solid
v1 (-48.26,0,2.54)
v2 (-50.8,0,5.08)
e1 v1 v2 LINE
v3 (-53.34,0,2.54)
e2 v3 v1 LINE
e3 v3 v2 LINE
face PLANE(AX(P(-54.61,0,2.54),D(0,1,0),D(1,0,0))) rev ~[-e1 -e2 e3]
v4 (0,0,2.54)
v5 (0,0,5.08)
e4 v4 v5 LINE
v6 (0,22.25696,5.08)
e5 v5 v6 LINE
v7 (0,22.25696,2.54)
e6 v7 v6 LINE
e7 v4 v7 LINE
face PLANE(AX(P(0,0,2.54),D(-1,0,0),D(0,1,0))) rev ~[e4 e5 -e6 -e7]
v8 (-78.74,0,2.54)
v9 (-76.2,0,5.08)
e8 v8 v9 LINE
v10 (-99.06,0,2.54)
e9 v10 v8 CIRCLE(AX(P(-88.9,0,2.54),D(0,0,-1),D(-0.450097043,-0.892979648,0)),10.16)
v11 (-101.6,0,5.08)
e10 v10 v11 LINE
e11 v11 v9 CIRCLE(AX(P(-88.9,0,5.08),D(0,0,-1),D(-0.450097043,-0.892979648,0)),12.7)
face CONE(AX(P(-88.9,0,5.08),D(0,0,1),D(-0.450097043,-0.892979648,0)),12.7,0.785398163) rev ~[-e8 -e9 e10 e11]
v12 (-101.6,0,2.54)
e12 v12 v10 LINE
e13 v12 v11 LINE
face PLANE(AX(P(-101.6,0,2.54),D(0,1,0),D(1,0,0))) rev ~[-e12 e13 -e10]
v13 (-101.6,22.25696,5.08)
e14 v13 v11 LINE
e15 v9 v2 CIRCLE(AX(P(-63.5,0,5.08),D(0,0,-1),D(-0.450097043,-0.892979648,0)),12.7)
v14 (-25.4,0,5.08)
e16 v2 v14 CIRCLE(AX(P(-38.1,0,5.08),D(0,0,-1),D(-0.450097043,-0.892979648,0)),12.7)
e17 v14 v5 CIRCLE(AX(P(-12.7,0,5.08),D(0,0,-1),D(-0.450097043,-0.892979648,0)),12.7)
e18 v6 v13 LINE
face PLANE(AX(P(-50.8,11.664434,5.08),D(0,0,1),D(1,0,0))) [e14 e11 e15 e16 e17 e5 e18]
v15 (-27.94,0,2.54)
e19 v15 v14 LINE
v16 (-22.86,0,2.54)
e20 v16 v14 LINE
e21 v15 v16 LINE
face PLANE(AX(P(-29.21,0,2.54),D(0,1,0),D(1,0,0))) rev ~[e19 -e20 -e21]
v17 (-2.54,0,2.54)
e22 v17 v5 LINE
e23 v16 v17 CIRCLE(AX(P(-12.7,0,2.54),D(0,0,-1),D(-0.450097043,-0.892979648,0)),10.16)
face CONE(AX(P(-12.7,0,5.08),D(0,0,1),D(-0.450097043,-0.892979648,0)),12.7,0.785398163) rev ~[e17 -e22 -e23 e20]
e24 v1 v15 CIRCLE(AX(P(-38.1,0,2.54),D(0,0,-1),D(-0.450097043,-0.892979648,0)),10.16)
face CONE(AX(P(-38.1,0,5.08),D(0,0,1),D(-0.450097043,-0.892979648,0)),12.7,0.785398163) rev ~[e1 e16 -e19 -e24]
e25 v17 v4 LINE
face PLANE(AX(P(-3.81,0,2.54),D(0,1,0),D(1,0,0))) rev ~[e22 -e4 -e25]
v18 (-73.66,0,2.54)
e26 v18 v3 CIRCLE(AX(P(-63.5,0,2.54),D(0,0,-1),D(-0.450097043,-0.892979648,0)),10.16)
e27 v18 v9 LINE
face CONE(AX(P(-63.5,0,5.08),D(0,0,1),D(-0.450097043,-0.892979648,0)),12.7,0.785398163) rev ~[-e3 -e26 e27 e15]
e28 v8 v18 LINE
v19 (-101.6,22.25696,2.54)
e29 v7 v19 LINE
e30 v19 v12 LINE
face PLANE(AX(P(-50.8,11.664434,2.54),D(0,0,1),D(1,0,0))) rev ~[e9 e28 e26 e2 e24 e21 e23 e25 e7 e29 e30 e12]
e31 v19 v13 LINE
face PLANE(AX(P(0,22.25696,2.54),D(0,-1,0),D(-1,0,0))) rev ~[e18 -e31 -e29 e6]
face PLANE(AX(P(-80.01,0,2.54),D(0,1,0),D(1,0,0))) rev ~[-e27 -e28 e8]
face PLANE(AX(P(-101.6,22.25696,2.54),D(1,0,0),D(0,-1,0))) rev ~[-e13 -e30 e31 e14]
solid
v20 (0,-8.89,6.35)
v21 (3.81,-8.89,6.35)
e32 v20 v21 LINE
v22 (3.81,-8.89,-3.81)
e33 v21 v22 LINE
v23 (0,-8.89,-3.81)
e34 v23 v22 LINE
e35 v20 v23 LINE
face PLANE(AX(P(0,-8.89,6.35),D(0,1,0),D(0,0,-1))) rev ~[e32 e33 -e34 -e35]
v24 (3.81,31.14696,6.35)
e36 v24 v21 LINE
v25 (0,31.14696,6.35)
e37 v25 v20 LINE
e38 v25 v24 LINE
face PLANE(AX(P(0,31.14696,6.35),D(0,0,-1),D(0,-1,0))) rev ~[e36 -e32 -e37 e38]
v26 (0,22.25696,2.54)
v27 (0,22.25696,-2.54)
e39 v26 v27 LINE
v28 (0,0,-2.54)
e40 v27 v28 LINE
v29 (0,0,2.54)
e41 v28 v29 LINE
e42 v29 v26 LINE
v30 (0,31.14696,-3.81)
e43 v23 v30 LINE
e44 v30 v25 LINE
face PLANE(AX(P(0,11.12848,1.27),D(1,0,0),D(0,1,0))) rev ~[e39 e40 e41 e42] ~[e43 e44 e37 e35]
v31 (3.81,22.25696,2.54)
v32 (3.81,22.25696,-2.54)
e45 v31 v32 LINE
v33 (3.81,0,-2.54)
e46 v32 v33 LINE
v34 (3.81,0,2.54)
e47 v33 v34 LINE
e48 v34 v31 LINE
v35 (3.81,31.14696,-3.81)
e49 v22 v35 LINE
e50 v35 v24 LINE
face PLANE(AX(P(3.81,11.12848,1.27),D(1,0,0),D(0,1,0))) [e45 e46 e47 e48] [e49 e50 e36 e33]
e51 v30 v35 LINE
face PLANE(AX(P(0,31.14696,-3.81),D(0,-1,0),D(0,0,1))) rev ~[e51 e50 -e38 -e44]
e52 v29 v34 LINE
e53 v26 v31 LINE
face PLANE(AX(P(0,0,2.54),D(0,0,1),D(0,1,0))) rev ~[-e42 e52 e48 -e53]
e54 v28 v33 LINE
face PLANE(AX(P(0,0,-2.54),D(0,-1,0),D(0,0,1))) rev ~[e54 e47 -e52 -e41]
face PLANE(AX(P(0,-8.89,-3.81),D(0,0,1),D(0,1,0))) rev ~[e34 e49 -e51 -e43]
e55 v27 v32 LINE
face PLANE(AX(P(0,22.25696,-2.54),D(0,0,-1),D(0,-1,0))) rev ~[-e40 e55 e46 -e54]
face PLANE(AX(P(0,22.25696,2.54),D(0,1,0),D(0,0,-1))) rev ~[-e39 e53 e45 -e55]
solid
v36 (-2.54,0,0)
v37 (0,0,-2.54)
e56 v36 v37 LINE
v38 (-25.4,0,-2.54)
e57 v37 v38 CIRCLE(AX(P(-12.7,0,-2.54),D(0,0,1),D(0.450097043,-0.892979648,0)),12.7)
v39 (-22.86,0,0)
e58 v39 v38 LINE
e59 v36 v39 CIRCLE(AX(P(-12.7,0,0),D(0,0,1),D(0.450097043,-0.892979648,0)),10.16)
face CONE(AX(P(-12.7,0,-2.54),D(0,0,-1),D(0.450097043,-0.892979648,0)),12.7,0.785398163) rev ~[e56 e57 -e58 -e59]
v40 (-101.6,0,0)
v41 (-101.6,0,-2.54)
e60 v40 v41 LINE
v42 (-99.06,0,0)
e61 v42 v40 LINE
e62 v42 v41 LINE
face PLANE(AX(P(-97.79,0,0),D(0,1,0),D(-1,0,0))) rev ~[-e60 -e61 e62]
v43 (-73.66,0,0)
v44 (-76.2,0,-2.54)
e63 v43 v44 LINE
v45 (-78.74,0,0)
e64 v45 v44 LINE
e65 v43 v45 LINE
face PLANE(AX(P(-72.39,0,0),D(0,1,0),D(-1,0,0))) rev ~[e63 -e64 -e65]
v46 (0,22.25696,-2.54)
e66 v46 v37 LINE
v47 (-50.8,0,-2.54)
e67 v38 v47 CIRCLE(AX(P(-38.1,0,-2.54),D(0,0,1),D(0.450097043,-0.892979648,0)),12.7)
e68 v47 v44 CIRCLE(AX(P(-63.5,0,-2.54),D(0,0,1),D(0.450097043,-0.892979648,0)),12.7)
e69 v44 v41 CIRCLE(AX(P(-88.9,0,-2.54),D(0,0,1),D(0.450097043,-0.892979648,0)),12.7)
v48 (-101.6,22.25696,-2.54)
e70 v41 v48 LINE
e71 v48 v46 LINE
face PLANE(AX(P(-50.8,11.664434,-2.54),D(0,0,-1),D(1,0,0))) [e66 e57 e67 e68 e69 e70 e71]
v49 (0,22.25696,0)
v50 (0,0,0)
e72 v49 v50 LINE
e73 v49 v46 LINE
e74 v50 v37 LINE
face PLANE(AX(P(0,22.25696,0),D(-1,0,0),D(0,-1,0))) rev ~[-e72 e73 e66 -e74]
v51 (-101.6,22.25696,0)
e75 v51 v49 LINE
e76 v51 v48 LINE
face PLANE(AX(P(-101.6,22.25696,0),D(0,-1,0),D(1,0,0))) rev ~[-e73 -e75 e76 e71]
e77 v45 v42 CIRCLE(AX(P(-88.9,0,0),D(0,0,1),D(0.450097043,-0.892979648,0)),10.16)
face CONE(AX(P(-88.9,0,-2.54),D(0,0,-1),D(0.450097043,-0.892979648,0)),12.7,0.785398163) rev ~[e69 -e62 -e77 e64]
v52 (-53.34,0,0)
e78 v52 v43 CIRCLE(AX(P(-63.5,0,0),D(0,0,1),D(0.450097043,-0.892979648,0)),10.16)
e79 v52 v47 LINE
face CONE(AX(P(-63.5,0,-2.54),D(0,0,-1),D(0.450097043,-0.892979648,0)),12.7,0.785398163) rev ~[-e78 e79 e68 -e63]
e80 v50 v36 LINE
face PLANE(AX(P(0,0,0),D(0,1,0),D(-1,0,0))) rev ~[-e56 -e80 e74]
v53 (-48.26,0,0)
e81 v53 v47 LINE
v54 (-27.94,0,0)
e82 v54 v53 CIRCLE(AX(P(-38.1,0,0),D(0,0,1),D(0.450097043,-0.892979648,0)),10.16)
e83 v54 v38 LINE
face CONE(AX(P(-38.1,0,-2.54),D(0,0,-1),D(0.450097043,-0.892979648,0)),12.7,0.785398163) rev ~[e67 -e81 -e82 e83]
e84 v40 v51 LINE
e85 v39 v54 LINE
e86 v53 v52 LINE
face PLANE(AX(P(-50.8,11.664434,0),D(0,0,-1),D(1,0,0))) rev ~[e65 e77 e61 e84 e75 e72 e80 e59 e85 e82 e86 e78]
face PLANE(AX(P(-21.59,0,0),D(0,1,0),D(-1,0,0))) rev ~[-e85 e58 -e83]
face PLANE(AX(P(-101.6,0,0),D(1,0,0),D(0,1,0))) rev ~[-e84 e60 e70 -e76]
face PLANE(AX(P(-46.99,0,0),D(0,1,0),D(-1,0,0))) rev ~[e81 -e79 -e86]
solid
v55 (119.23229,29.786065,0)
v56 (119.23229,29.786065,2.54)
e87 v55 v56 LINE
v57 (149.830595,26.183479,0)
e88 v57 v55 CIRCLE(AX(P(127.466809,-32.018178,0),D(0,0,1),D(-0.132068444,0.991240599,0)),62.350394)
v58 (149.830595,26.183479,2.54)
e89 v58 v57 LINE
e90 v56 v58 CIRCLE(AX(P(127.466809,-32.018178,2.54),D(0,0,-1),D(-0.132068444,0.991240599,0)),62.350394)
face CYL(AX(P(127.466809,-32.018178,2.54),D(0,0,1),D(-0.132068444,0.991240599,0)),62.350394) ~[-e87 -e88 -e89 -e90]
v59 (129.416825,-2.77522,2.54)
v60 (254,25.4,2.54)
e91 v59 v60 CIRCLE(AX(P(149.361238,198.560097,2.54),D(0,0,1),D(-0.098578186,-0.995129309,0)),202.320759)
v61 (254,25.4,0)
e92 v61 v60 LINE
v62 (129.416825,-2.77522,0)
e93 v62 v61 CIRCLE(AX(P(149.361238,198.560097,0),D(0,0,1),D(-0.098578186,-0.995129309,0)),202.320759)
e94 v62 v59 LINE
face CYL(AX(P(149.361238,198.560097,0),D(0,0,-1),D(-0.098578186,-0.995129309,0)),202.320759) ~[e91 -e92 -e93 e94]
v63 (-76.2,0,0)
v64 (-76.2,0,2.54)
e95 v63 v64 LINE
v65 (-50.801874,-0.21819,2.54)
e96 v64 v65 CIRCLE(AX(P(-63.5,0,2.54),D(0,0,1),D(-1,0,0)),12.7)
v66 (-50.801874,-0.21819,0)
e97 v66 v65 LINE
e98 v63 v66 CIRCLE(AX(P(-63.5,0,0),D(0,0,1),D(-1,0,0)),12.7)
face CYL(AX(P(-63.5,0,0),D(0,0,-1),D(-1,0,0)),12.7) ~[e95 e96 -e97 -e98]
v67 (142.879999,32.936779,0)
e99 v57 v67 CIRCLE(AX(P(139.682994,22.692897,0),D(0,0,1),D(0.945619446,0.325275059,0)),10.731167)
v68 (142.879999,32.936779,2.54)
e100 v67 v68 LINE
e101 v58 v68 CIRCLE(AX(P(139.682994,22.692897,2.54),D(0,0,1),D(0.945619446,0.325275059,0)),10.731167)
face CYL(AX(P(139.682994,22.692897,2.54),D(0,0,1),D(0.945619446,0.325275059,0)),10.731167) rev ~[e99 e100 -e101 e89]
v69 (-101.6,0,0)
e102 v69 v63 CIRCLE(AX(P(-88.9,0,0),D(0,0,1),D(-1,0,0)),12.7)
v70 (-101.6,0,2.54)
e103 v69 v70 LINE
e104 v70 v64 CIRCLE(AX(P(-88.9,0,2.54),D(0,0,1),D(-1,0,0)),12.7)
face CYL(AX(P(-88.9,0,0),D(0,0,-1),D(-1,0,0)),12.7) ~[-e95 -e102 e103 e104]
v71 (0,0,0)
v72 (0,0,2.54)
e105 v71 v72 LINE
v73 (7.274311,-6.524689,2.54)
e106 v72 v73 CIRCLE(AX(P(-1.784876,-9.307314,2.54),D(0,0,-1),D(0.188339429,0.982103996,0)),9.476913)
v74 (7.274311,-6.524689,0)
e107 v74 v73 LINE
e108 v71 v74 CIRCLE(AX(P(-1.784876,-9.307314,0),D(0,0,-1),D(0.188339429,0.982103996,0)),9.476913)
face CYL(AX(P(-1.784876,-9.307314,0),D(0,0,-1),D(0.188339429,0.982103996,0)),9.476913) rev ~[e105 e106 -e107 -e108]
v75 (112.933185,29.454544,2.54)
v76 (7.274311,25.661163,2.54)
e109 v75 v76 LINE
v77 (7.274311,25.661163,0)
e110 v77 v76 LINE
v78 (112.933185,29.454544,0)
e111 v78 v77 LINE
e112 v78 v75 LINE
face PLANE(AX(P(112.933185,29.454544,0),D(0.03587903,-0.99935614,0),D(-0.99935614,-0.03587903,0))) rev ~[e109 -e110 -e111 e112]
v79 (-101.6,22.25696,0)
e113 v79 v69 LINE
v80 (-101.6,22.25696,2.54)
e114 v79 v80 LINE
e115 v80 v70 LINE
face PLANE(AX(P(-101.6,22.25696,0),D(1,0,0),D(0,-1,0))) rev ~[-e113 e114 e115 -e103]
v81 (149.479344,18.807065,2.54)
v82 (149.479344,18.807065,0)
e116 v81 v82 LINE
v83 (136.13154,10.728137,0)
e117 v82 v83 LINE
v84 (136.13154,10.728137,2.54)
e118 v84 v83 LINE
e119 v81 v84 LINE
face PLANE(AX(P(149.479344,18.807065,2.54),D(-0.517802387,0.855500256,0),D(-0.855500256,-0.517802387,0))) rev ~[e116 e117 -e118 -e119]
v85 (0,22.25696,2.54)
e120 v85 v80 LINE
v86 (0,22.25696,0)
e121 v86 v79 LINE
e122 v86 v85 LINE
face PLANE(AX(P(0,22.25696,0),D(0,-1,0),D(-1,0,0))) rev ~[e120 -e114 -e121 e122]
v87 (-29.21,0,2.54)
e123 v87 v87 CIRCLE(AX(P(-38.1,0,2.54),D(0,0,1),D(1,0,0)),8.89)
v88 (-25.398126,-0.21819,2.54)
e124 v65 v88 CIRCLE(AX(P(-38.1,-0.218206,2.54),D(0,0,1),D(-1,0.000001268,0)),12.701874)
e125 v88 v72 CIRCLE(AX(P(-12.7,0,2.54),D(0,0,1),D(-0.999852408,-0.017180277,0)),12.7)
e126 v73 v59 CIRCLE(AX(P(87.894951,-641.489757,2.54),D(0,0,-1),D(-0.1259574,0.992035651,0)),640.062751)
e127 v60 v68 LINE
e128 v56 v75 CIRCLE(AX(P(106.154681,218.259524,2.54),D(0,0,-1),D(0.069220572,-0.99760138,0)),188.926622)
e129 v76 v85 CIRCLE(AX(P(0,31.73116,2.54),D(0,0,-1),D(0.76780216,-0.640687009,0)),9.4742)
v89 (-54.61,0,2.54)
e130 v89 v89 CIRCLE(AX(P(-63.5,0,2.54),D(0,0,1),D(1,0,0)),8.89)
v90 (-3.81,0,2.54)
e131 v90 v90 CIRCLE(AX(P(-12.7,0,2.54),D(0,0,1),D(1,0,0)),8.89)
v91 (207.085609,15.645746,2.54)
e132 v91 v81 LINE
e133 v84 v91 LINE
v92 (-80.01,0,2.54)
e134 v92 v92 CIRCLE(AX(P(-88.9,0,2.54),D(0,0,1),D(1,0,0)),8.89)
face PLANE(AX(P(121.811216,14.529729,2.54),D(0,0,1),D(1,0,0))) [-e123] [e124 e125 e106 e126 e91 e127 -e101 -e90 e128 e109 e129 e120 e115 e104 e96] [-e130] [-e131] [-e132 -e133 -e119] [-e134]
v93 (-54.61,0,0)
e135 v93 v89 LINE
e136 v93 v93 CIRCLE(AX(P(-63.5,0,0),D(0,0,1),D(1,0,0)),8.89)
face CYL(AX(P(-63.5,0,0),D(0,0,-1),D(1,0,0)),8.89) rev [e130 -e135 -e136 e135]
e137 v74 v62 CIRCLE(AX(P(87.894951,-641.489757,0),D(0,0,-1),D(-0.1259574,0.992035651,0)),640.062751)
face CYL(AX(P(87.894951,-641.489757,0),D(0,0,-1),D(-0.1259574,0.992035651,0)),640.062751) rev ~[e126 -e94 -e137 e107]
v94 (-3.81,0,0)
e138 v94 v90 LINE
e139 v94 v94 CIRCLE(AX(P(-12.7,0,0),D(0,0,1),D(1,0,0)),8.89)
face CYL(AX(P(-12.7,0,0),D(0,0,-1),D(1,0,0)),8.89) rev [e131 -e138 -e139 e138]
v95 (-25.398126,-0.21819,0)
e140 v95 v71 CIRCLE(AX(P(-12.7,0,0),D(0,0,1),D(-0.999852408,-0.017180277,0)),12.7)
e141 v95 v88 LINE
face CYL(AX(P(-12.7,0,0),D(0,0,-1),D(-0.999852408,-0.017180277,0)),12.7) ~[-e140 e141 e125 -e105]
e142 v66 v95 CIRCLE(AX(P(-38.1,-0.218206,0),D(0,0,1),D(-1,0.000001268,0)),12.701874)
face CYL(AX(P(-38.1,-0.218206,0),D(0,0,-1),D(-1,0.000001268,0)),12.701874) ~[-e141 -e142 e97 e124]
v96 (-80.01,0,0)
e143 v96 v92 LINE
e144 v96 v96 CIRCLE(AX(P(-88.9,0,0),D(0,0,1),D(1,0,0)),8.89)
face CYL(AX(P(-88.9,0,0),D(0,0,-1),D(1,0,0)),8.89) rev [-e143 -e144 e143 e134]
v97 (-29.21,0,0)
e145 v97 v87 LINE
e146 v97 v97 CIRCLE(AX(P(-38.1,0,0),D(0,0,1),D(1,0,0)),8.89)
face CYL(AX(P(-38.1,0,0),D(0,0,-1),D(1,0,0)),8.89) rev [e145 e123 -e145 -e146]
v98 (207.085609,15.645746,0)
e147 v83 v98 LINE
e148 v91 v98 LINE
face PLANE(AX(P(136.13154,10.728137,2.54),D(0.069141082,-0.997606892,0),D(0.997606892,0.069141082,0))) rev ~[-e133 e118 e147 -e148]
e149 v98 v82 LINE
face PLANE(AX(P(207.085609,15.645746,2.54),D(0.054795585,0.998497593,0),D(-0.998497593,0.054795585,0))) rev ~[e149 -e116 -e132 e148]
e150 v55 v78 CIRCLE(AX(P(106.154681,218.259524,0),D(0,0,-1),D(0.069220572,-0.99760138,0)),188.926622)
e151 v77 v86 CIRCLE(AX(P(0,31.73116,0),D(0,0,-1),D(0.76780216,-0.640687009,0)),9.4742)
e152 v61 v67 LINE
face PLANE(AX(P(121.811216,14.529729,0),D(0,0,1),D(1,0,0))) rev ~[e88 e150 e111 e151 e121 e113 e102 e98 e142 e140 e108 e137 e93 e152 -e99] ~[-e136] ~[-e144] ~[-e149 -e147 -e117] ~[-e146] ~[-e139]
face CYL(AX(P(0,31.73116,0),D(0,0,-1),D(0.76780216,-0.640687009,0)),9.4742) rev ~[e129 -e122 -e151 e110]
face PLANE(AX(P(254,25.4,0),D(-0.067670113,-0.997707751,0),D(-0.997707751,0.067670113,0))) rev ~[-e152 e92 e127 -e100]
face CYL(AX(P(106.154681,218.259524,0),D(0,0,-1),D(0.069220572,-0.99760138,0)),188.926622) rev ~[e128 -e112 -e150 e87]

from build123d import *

# Parameters (mm, degrees)
F0_R          = 8.89
F1_DEPTH      = 2.54
F3_DEPTH      = 25.4
F5_DEPTH      = 2.54
F7_DEPTH      = 2.54
F8_T2_ANGLE   = 306.5001793885
F8_T4_ANGLE   = 306.5001793885
F8_T6_ANGLE   = 306.5001793885
F8_T8_ANGLE   = 306.5001793885
F8_2_T2_ANGLE = 306.5001793885
F8_2_T4_ANGLE = 306.5001793885
F8_2_T6_ANGLE = 306.5001793885
F8_2_T8_ANGLE = 306.5001793885
F10_DEPTH     = 3.81


# Not quite as in the source:
# - a fillet or chamfer that OpenCascade refuses, or shapes differently, is made with other operations: its cross-section is extruded or revolved along the edge and cut away or added


with BuildPart() as f1:
    # F0 (on Top) → F1 (new body)
    with BuildSketch(Plane.XY):
        with BuildLine():
            Line((0, 22.2569602452), (0, 0))
            ThreePointArc((0, 0), (4.5429449248, -2.2524889562), (7.2743112207, -6.5246890036))
            ThreePointArc((7.2743112207, -6.5246890036), (68.2558827077, -1.7283700883), (129.4168248237, -2.7752204279))
            ThreePointArc((129.4168248237, -2.7752204279), (193.990196572, 1.2229597331), (254, 25.4))
            Line((254, 25.4), (142.8799988323, 32.9367792524))
            Line((142.8799988323, 32.9367792524), (119.2322895651, 29.7860647099))
            ThreePointArc((119.2322895651, 29.7860647099), (116.0841208365, 29.5940132977), (112.9331847352, 29.4545436828))
            Line((112.9331847352, 29.4545436828), (7.2743112207, 25.6611633832))
            ThreePointArc((7.2743112207, 25.6611633832), (4.0157254245, 23.1501104869), (0, 22.2569602452))
        make_face()
        with BuildLine():
            ThreePointArc((-25.3981255835, -0.218189517), (-12.5909012159, -12.6995313872), (0, 0))
            Line((0, 0), (0, 22.2569602452))
            Line((0, 22.2569602452), (-34.8408528237, 22.2569602452))
            ThreePointArc((-34.8408528237, 22.2569602452), (-50.8, 21.91440634), (-66.7591471763, 22.2569602452))
            Line((-66.7591471763, 22.2569602452), (-101.6, 22.2569602452))
            Line((-101.6, 22.2569602452), (-101.6, 0))
            ThreePointArc((-101.6, 0), (-88.9, -12.7), (-76.2, 0))
            ThreePointArc((-76.2, 0), (-63.6090987841, -12.6995313872), (-50.8018744165, -0.218189517))
            ThreePointArc((-50.8018744165, -0.218189517), (-38.1, -12.9200800362), (-25.3981255835, -0.218189517))
        make_face()
        with Locations((-88.9, 0)):
            Circle(F0_R, mode=Mode.SUBTRACT)
        with Locations((-63.5, 0)):
            Circle(F0_R, mode=Mode.SUBTRACT)
        with BuildLine():
            ThreePointArc((-50.8, 0), (-50.8004686128, -0.1090987841), (-50.8018744165, -0.218189517))
            ThreePointArc((-50.8018744165, -0.218189517), (-50.8014057346, -0.1090907335), (-50.8, 0))
        make_face(mode=Mode.SUBTRACT)
        with Locations((-38.1, 0)):
            Circle(F0_R, mode=Mode.SUBTRACT)
        with BuildLine():
            ThreePointArc((-25.4, 0), (-25.3985942654, -0.1090907335), (-25.3981255835, -0.218189517))
            ThreePointArc((-25.3981255835, -0.218189517), (-25.3995313872, -0.1090987841), (-25.4, 0))
        make_face(mode=Mode.SUBTRACT)
        with Locations((-12.7, 0)):
            Circle(F0_R, mode=Mode.SUBTRACT)
        with BuildLine():
            ThreePointArc((-66.7591471763, 22.2569602452), (-50.8, 21.91440634), (-34.8408528237, 22.2569602452))
            Line((-34.8408528237, 22.2569602452), (-66.7591471763, 22.2569602452))
        make_face()
        with BuildLine():
            ThreePointArc((-50.8, 0), (-50.8014057346, -0.1090907335), (-50.8018744165, -0.218189517))
            ThreePointArc((-50.8018744165, -0.218189517), (-50.8004686128, -0.1090987841), (-50.8, 0))
        make_face()
        with BuildLine():
            ThreePointArc((-25.4, 0), (-25.3995313872, -0.1090987841), (-25.3981255835, -0.218189517))
            ThreePointArc((-25.3981255835, -0.218189517), (-25.3985942654, -0.1090907335), (-25.4, 0))
        make_face()
    extrude(amount=F1_DEPTH)

    # F2 (on face) → F3 (cut)
    with BuildSketch(Plane.XY.offset(2.54)):
        with BuildLine():
            ThreePointArc((119.2322895651, 29.7860647099), (134.7574672595, 29.9044998636), (149.8305946589, 26.1834785342))
            ThreePointArc((149.8305946589, 26.1834785342), (147.1610546869, 30.3894267459), (142.8799988323, 32.9367792524))
            Line((142.8799988323, 32.9367792524), (119.2322895651, 29.7860647099))
        make_face()
        Polygon((207.085609436, 15.6457461417), (149.4793444872, 18.8070647418), (136.1315399408, 10.7281366363), align=None)
    extrude(amount=-F3_DEPTH, mode=Mode.SUBTRACT)


with BuildPart() as f5:
    # F4 (on face) → F5 (new body)
    with BuildSketch(Plane.XY.offset(2.54)):
        with BuildLine():
            Line((0, 0), (0, 22.2569602452))
            Line((0, 22.2569602452), (-101.6, 22.2569602452))
            Line((-101.6, 22.2569602452), (-101.6, 0))
            Line((-101.6, 0), (-97.79, 0))
            ThreePointArc((-97.79, 0), (-88.9, 8.89), (-80.01, 0))
            Line((-80.01, 0), (-76.2, 0))
            Line((-76.2, 0), (-72.39, 0))
            ThreePointArc((-72.39, 0), (-63.5, 8.89), (-54.61, 0))
            Line((-54.61, 0), (-46.99, 0))
            ThreePointArc((-46.99, 0), (-38.1, 8.89), (-29.21, 0))
            Line((-29.21, 0), (-21.59, 0))
            ThreePointArc((-21.59, 0), (-12.7, 8.89), (-3.81, 0))
            Line((-3.81, 0), (0, 0))
        make_face()
    extrude(amount=F5_DEPTH)

    # F8: chamfer of 3.81 on 4 edges, made by hand

    # F8_s1 → F8_t2 (revolve, cut)
    with BuildSketch(Plane(origin=(-70.8899847432, 35.7313546731, 0), x_dir=(0, 0, 1), z_dir=(0.892979648, -0.4500970431, 0))):
        Polygon((5.08, 52.7136271329), (1.27, 48.9036271329), (5.08, 48.9036271329), align=None)
    revolve(axis=Axis((-88.9, 0, 5.08), (0, 0, -1)), revolution_arc=F8_T2_ANGLE, mode=Mode.SUBTRACT)

    # F8_s3 → F8_t4 (revolve, cut)
    with BuildSketch(Plane(origin=(-50.635703388, 25.5223961951, 0), x_dir=(0, 0, 1), z_dir=(0.892979648, -0.4500970431, 0))):
        Polygon((5.08, 41.2811622378), (1.27, 37.4711622378), (5.08, 37.4711622378), align=None)
    revolve(axis=Axis((-63.5, 0, 5.08), (0, 0, -1)), revolution_arc=F8_T4_ANGLE, mode=Mode.SUBTRACT)

    # F8_s5 → F8_t6 (revolve, cut)
    with BuildSketch(Plane(origin=(-30.3814220328, 15.3134377171, 0), x_dir=(0, 0, 1), z_dir=(0.892979648, -0.4500970431, 0))):
        Polygon((5.08, 29.8486973427), (1.27, 26.0386973427), (5.08, 26.0386973427), align=None)
    revolve(axis=Axis((-38.1, 0, 5.08), (0, 0, -1)), revolution_arc=F8_T6_ANGLE, mode=Mode.SUBTRACT)

    # F8_s7 → F8_t8 (revolve, cut)
    with BuildSketch(Plane(origin=(-10.1271406776, 5.104479239, 0), x_dir=(0, 0, 1), z_dir=(0.892979648, -0.4500970431, 0))):
        Polygon((5.08, 18.4162324476), (1.27, 14.6062324476), (5.08, 14.6062324476), align=None)
    revolve(axis=Axis((-12.7, 0, 5.08), (0, 0, -1)), revolution_arc=F8_T8_ANGLE, mode=Mode.SUBTRACT)


with BuildPart() as f7:
    # F6 (on face) → F7 (new body)
    with BuildSketch(Plane(origin=(0, 0, 0), x_dir=(1, 0, 0), z_dir=(0, 0, -1))):
        with BuildLine():
            Line((-101.6, -22.2569602452), (0, -22.2569602452))
            Line((0, -22.2569602452), (0, 0))
            Line((0, 0), (-3.81, 0))
            ThreePointArc((-3.81, 0), (-12.7, -8.89), (-21.59, 0))
            Line((-21.59, 0), (-29.21, 0))
            ThreePointArc((-29.21, 0), (-38.1, -8.89), (-46.99, 0))
            Line((-46.99, 0), (-54.61, 0))
            ThreePointArc((-54.61, 0), (-63.5, -8.89), (-72.39, 0))
            Line((-72.39, 0), (-76.2, 0))
            Line((-76.2, 0), (-80.01, 0))
            ThreePointArc((-80.01, 0), (-88.9, -8.89), (-97.79, 0))
            Line((-97.79, 0), (-101.6, 0))
            Line((-101.6, 0), (-101.6, -22.2569602452))
        make_face()
    extrude(amount=F7_DEPTH)

    # F8#2: chamfer of 3.81 on 4 edges, made by hand

    # F8_2_s1 → F8_2_t2 (revolve, cut)
    with BuildSketch(Plane(origin=(-30.3814220328, -15.3134377171, 0), x_dir=(0, 0, 1), z_dir=(-0.892979648, -0.4500970431, 0))):
        Polygon((-2.54, 4.4486973427), (1.27, 8.2586973427), (-2.54, 8.2586973427), align=None)
    revolve(axis=Axis((-38.1, 0, -2.54), (0, 0, 1)), revolution_arc=F8_2_T2_ANGLE, mode=Mode.SUBTRACT)

    # F8_2_s3 → F8_2_t4 (revolve, cut)
    with BuildSketch(Plane(origin=(-10.1271406776, -5.104479239, 0), x_dir=(0, 0, 1), z_dir=(-0.892979648, -0.4500970431, 0))):
        Polygon((-2.54, -6.9837675524), (1.27, -3.1737675524), (-2.54, -3.1737675524), align=None)
    revolve(axis=Axis((-12.7, 0, -2.54), (0, 0, 1)), revolution_arc=F8_2_T4_ANGLE, mode=Mode.SUBTRACT)

    # F8_2_s5 → F8_2_t6 (revolve, cut)
    with BuildSketch(Plane(origin=(-50.635703388, -25.5223961951, 0), x_dir=(0, 0, 1), z_dir=(-0.892979648, -0.4500970431, 0))):
        Polygon((-2.54, 15.8811622378), (1.27, 19.6911622378), (-2.54, 19.6911622378), align=None)
    revolve(axis=Axis((-63.5, 0, -2.54), (0, 0, 1)), revolution_arc=F8_2_T6_ANGLE, mode=Mode.SUBTRACT)

    # F8_2_s7 → F8_2_t8 (revolve, cut)
    with BuildSketch(Plane(origin=(-70.8899847432, -35.7313546731, 0), x_dir=(0, 0, 1), z_dir=(-0.892979648, -0.4500970431, 0))):
        Polygon((-2.54, 27.3136271329), (1.27, 31.1236271329), (-2.54, 31.1236271329), align=None)
    revolve(axis=Axis((-88.9, 0, -2.54), (0, 0, 1)), revolution_arc=F8_2_T8_ANGLE, mode=Mode.SUBTRACT)


with BuildPart() as f10:
    # F9 (on face) → F10 (new body)
    with BuildSketch(Plane.YZ):
        Polygon((0, -3.81), (22.2569602452, -3.81), (31.1469602452, -3.81), (31.1469602452, 6.35), (22.2569602452, 6.35), (0, 6.35), (-8.89, 6.35), (-8.89, -3.81), align=None)
        Polygon((22.2569602452, 2.54), (22.2569602452, 0), (22.2569602452, -2.54), (0, -2.54), (0, 0), (0, 2.54), align=None, mode=Mode.SUBTRACT)
    extrude(amount=F10_DEPTH)


solid = Compound([f1.part, f5.part, f7.part, f10.part])
